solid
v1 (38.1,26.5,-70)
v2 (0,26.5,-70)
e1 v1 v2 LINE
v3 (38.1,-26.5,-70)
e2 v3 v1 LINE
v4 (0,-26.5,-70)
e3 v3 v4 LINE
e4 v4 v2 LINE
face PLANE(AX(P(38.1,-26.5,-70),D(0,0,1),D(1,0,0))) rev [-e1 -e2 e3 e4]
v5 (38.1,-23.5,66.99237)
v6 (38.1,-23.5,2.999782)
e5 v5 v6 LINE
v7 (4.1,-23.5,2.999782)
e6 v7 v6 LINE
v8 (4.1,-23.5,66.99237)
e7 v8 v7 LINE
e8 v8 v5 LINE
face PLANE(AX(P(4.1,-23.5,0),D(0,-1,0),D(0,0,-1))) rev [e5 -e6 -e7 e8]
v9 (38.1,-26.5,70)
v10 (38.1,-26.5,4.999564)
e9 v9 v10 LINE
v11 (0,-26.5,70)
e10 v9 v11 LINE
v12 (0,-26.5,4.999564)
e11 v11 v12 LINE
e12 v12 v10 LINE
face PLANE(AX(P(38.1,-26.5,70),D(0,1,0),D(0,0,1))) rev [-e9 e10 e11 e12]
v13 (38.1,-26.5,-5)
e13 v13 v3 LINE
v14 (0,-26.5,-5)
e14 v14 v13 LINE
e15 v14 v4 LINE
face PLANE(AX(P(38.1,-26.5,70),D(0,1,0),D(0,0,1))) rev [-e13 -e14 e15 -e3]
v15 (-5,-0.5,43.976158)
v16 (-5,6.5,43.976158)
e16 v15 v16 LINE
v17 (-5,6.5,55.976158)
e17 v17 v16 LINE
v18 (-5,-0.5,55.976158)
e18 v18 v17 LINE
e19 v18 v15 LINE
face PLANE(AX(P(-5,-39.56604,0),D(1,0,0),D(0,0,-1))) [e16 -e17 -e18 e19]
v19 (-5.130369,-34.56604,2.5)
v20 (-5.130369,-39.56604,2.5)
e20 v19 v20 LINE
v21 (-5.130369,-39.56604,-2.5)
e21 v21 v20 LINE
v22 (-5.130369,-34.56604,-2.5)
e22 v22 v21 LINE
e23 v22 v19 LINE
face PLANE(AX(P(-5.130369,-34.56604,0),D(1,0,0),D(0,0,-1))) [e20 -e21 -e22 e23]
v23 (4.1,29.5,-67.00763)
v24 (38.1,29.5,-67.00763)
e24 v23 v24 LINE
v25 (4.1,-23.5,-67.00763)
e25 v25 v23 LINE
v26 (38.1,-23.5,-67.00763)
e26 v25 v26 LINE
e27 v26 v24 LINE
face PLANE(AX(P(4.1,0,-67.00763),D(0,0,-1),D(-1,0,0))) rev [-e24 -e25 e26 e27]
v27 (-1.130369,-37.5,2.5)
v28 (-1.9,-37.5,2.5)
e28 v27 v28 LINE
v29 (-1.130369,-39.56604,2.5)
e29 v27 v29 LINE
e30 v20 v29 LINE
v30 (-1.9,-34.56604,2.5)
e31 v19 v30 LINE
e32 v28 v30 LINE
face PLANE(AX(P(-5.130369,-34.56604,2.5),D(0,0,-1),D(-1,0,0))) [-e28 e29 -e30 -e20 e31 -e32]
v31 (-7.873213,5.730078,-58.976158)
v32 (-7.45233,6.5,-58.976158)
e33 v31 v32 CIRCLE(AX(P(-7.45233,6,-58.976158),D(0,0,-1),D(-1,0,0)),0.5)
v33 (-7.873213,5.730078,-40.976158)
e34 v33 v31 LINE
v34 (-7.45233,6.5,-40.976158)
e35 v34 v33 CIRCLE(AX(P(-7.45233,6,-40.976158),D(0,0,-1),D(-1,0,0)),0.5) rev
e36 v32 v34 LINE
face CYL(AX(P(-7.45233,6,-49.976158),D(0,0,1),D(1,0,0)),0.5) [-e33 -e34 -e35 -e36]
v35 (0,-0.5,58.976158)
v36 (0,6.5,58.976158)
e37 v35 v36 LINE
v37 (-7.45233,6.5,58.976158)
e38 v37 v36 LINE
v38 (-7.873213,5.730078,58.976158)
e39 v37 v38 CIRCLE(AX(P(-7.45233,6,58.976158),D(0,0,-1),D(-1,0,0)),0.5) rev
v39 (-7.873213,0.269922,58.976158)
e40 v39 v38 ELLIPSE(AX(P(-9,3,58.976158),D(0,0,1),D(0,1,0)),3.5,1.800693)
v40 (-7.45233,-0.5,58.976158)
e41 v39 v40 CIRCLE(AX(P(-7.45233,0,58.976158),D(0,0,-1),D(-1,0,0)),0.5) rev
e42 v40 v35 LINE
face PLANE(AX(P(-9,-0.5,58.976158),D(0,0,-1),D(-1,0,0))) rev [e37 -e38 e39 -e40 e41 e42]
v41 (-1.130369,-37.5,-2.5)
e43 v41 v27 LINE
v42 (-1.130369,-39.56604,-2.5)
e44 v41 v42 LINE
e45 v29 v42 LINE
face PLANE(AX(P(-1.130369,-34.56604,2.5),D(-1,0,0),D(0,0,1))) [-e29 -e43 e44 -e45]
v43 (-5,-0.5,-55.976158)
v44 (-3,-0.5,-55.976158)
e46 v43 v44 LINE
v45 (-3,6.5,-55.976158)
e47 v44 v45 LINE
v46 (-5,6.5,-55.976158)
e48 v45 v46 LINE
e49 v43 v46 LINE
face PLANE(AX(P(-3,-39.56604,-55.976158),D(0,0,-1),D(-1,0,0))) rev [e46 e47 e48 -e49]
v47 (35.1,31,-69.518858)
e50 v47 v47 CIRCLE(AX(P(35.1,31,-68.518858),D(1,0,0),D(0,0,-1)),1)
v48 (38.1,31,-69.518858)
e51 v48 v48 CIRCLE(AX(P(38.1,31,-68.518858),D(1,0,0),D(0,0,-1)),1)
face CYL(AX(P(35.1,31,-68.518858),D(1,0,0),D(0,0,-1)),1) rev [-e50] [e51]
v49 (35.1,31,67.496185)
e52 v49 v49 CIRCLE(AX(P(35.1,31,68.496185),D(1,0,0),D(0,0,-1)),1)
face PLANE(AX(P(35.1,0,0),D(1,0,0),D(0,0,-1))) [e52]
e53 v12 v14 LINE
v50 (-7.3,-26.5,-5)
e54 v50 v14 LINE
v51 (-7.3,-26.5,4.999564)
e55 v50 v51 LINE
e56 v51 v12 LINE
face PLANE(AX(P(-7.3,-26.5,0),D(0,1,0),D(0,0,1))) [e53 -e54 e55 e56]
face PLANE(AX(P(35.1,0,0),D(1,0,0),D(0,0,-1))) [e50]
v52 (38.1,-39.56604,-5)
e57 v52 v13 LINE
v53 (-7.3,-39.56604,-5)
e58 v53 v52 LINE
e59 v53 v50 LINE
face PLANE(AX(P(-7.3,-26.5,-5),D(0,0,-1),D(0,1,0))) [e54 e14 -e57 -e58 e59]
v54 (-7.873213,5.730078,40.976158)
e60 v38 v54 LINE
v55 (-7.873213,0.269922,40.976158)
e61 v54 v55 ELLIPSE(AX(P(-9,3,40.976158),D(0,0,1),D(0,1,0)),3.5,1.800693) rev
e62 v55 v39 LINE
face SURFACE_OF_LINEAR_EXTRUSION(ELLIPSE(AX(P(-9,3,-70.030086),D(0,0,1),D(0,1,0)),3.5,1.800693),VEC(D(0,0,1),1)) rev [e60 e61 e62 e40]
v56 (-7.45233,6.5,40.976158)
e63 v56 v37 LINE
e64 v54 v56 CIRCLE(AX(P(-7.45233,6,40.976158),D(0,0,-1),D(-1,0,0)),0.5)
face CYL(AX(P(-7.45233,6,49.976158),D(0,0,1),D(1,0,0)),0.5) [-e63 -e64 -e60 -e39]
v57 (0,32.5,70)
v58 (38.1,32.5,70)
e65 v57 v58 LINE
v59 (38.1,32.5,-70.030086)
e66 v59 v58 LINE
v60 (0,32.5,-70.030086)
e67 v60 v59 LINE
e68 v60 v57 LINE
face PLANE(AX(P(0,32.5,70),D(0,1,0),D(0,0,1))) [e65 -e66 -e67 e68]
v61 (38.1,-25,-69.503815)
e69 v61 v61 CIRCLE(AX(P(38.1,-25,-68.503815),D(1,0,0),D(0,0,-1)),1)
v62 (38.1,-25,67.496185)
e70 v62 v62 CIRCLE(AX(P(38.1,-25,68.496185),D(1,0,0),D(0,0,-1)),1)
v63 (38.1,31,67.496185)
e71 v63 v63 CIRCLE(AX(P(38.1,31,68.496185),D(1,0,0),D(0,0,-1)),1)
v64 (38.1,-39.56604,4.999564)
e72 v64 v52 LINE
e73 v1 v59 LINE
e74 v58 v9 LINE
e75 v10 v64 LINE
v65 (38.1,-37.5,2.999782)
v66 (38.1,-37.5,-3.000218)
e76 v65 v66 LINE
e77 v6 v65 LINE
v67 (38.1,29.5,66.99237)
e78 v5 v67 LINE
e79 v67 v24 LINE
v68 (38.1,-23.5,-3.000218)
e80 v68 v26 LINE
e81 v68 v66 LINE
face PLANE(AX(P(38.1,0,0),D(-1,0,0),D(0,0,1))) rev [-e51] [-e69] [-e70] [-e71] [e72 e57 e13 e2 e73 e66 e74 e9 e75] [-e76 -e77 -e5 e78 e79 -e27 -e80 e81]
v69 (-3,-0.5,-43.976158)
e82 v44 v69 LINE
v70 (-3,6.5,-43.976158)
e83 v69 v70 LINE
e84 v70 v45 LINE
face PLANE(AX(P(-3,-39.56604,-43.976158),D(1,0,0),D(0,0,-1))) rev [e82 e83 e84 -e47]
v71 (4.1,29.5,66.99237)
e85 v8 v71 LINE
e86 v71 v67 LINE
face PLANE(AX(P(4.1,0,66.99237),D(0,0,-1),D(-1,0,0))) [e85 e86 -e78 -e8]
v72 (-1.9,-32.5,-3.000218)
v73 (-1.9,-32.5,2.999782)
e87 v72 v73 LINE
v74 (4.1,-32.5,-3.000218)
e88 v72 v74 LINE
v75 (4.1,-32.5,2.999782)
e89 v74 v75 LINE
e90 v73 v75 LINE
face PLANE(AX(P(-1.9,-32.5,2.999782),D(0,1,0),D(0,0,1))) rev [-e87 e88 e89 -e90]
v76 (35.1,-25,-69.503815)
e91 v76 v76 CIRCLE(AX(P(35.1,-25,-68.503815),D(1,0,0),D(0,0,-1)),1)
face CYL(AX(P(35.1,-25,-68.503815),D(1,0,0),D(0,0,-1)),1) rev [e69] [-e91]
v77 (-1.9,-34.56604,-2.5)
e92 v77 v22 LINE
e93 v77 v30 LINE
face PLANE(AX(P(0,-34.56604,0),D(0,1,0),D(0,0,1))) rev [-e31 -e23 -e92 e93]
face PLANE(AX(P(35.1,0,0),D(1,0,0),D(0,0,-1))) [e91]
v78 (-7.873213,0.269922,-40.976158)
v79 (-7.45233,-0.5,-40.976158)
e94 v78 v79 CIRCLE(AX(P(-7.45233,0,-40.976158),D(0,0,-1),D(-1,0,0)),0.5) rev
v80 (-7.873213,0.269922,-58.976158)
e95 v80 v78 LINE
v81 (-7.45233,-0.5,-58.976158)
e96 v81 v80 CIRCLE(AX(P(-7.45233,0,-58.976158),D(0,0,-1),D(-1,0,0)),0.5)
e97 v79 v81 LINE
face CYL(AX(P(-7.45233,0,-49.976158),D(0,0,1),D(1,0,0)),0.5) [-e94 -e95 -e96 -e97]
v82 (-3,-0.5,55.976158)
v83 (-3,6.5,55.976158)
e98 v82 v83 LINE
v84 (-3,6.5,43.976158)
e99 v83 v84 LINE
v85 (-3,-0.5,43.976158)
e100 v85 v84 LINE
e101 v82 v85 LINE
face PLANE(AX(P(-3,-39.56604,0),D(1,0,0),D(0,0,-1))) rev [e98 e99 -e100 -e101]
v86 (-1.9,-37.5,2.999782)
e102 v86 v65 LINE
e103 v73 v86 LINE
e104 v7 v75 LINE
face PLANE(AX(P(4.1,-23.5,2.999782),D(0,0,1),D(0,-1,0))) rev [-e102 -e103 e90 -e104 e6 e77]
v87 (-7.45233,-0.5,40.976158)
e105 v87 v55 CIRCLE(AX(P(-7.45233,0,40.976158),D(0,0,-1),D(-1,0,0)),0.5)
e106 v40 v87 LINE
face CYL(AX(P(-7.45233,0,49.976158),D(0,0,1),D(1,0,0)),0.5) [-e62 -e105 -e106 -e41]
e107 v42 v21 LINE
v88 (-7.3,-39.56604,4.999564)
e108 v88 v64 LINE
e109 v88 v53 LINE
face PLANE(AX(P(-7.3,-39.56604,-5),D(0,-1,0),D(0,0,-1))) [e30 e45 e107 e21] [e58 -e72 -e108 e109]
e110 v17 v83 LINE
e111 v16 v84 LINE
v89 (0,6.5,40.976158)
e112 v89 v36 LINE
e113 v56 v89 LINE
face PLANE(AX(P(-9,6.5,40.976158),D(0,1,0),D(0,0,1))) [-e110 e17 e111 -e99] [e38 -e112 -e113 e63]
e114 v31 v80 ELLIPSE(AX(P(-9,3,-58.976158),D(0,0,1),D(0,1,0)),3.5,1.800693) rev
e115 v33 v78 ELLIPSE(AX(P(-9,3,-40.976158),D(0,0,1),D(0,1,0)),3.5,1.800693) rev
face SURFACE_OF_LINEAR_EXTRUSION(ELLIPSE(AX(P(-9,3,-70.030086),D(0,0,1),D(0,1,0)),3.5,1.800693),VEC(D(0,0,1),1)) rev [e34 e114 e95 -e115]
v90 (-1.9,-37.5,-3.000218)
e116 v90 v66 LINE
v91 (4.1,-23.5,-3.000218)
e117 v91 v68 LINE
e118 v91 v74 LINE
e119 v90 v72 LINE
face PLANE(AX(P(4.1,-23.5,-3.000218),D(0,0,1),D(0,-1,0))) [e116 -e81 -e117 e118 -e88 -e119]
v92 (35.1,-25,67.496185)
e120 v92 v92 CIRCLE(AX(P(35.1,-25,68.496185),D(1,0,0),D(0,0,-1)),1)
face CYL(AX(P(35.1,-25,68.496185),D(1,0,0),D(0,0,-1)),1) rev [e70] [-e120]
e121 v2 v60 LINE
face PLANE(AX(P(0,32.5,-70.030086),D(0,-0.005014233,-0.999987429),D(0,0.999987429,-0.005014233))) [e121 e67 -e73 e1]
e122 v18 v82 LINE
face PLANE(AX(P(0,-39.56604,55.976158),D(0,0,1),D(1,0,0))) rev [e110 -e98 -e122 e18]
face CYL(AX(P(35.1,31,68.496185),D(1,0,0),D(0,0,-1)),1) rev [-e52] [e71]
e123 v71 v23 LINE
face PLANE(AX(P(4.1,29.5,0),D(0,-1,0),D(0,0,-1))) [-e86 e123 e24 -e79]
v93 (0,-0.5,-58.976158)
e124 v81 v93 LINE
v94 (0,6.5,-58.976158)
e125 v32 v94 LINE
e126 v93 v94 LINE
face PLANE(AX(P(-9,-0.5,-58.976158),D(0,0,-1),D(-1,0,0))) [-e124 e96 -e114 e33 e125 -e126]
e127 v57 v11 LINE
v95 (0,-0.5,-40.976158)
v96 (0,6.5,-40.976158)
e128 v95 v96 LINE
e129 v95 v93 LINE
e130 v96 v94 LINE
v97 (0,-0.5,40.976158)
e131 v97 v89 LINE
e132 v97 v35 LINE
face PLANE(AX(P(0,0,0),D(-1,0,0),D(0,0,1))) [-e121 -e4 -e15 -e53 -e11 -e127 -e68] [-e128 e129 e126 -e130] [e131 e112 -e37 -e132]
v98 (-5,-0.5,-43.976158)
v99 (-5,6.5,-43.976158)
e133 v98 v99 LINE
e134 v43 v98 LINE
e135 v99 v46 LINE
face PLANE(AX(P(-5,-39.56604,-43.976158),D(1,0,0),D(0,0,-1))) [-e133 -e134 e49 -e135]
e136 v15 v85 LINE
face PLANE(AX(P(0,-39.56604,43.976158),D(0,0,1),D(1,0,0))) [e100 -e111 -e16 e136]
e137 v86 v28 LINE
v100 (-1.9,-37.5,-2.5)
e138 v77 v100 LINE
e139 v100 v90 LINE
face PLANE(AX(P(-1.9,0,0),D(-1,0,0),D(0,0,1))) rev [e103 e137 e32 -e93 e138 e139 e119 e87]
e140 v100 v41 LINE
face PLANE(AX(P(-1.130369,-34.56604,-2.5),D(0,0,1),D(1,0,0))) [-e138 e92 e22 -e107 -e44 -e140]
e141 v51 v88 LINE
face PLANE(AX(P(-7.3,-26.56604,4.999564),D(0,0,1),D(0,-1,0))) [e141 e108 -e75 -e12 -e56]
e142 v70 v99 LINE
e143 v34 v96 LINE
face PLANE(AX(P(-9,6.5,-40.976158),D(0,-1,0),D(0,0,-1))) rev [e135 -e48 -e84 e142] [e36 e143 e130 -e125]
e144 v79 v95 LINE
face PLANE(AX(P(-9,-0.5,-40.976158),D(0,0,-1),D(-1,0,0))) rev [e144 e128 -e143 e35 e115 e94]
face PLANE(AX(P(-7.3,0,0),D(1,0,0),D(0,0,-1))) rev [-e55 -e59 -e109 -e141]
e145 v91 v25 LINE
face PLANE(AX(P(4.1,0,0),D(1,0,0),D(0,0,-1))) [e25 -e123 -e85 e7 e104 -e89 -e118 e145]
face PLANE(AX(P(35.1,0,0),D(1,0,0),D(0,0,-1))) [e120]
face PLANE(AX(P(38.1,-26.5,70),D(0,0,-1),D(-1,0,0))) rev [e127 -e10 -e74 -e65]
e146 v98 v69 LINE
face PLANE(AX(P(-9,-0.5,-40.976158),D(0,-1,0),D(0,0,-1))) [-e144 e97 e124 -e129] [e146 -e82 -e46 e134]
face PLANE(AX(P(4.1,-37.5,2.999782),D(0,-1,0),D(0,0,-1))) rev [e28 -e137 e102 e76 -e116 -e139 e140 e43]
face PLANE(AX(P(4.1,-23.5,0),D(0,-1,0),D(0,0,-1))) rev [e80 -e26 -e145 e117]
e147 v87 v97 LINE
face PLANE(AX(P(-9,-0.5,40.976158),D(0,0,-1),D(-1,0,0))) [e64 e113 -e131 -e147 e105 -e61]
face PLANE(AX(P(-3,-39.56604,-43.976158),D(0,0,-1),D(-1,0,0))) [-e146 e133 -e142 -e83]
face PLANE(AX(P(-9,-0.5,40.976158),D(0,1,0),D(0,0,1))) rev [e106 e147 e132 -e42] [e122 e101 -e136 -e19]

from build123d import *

# Parameters (mm, degrees)
SKETCH1_W           = 140
SKETCH1_H           = 53
BOSS_EXTRUDE1_DEPTH = 38.1
BOSS_EXTRUDE2_DEPTH = 45.4
CUT_EXTRUDE1_DEPTH  = 5
BOSS_EXTRUDE3_DEPTH = 45.4
BOSS_EXTRUDE4_DEPTH = 38.1
SKETCH11_W          = 134
SKETCH11_H          = 53
CUT_EXTRUDE2_DEPTH  = 34
SKETCH12_W          = 6
SKETCH12_H          = 14
CUT_EXTRUDE3_DEPTH  = 34
SKETCH13_W          = 6
SKETCH13_H          = 5
CUT_EXTRUDE4_DEPTH  = 6
CUT_EXTRUDE6_DEPTH  = 3
CUT_EXTRUDE7_DEPTH  = 3
SKETCH17_W          = 18
SKETCH17_H          = 7
BOSS_EXTRUDE5_DEPTH = 9
SKETCH21_W          = 2
SKETCH21_H          = 12
CUT_EXTRUDE10_DEPTH = 93.075528643
SKETCH23_RX         = 3.5
SKETCH23_RY         = 1.800693379
CUT_EXTRUDE12_DEPTH = 141.213025648
FILLET3_START       = -60
FILLET3_DEPTH       = 120


with BuildPart() as part:
    # Sketch1 → Boss-Extrude1 (new body)
    with BuildSketch(Plane(origin=(0, 0, 0), x_dir=(0, 0, -1), z_dir=(1, 0, 0))):
        Rectangle(SKETCH1_W, SKETCH1_H)
    extrude(amount=BOSS_EXTRUDE1_DEPTH)

    # Sketch2 → Boss-Extrude2 (add)
    with BuildSketch(Plane(origin=(38.1, 0, 0), x_dir=(0, 0, -1), z_dir=(1, 0, 0))):
        Polygon((0, -26.5), (5, -26.5), (5, -39.566040215), (-4.99956385, -39.566040215), (-4.99956385, -26.566040215), align=None)
    extrude(amount=-BOSS_EXTRUDE2_DEPTH)

    # Sketch3 → Cut-Extrude1 (cut)
    with BuildSketch(Plane.XZ.offset(39.566040215)):
        Polygon((-5.130369, 0), (-5.130369, 2.5), (-1.130369, 2.5), (-1.130369, -2.5), (-5.130369, -2.5), align=None)
    extrude(amount=-CUT_EXTRUDE1_DEPTH, mode=Mode.SUBTRACT)

    # Sketch7 → Boss-Extrude3 (add)
    with BuildSketch(Plane(origin=(38.1, 0, 0), x_dir=(0, 0, -1), z_dir=(1, 0, 0))):
        Polygon((-4.99956385, -26.566040215), (-4.99956385, -26.5), (0, -26.5), align=None)
    extrude(amount=-BOSS_EXTRUDE3_DEPTH)

    # Sketch8 → Boss-Extrude4 (add)
    with BuildSketch(Plane(origin=(38.1, 0, 0), x_dir=(0, 0, -1), z_dir=(1, 0, 0))):
        Polygon((-70, 26.5), (-70, 32.5), (70.030085777, 32.5), (70, 26.5), align=None)
    extrude(amount=-BOSS_EXTRUDE4_DEPTH)

    # Sketch11 → Cut-Extrude2 (cut)
    with BuildSketch(Plane(origin=(38.1, 0, 0), x_dir=(0, 0, -1), z_dir=(1, 0, 0))):
        with Locations((0.007630482, 3)):
            Rectangle(SKETCH11_W, SKETCH11_H)
    extrude(amount=-CUT_EXTRUDE2_DEPTH, mode=Mode.SUBTRACT)

    # Sketch12 → Cut-Extrude3 (cut)
    with BuildSketch(Plane(origin=(38.1, 0, 0), x_dir=(0, 0, -1), z_dir=(1, 0, 0))):
        with Locations((0.000218075, -30.5)):
            Rectangle(SKETCH12_W, SKETCH12_H)
    extrude(amount=-CUT_EXTRUDE3_DEPTH, mode=Mode.SUBTRACT)

    # Sketch13 → Cut-Extrude4 (cut)
    with BuildSketch(Plane(origin=(4.1, 0, 0), x_dir=(0, 0, -1), z_dir=(1, 0, 0))):
        with Locations((0.000218075, -35)):
            Rectangle(SKETCH13_W, SKETCH13_H)
    extrude(amount=-CUT_EXTRUDE4_DEPTH, mode=Mode.SUBTRACT)

    # Sketch15 → Cut-Extrude6 (cut)
    with BuildSketch(Plane(origin=(38.1, 0, 0), x_dir=(0, 0, -1), z_dir=(1, 0, 0))):
        with BuildLine():
            ThreePointArc((-67.496184759, 31), (-68.114088128, 31.924122375), (-69.204189088, 31.706208093))
            Line((-69.204189088, 31.706208093), (-67.78818043, 30.293791907))
            ThreePointArc((-67.78818043, 30.293791907), (-67.572062384, 30.617903369), (-67.496184759, 31))
        make_face()
        with BuildLine():
            Line((-67.78818043, 30.293791907), (-69.204189088, 31.706208093))
            ThreePointArc((-69.204189088, 31.706208093), (-69.202392852, 30.291995671), (-67.78818043, 30.293791907))
        make_face()
    extrude(amount=-CUT_EXTRUDE6_DEPTH, mode=Mode.SUBTRACT)

    # Sketch16 → Cut-Extrude7 (cut)
    with BuildSketch(Plane(origin=(38.1, 0, 0), x_dir=(0, 0, -1), z_dir=(1, 0, 0))):
        with BuildLine():
            ThreePointArc((69.228596491, 31.70446537), (67.814392759, 31.709738362), (67.809119767, 30.29553463))
            Line((67.809119767, 30.29553463), (69.228596491, 31.70446537))
        make_face()
        with BuildLine():
            Line((69.228596491, 31.70446537), (67.809119767, 30.29553463))
            ThreePointArc((67.809119767, 30.29553463), (68.899818519, 30.075408641), (69.518858129, 31))
            ThreePointArc((69.518858129, 31), (69.443449488, 31.38096039), (69.228596491, 31.70446537))
        make_face()
        with BuildLine():
            ThreePointArc((69.503815241, -25), (68.887086814, -24.076364303), (67.797609438, -24.291993387))
            Line((67.797609438, -24.291993387), (69.210021043, -25.708006613))
            ThreePointArc((69.210021043, -25.708006613), (69.427450938, -25.383271573), (69.503815241, -25))
        make_face()
        with BuildLine():
            Line((69.210021043, -25.708006613), (67.797609438, -24.291993387))
            ThreePointArc((67.797609438, -24.291993387), (67.795808628, -25.706205803), (69.210021043, -25.708006613))
        make_face()
        with BuildLine():
            ThreePointArc((-67.496184759, -25), (-67.572062384, -24.617903369), (-67.78818043, -24.293791907))
            Line((-67.78818043, -24.293791907), (-69.204189088, -25.706208093))
            ThreePointArc((-69.204189088, -25.706208093), (-68.114088128, -25.924122375), (-67.496184759, -25))
        make_face()
        with BuildLine():
            Line((-69.204189088, -25.706208093), (-67.78818043, -24.293791907))
            ThreePointArc((-67.78818043, -24.293791907), (-69.202392852, -24.291995671), (-69.204189088, -25.706208093))
        make_face()
    extrude(amount=-CUT_EXTRUDE7_DEPTH, mode=Mode.SUBTRACT)

    # Sketch17 → Boss-Extrude5 (add)
    with BuildSketch(Plane.ZY):
        with Locations((49.976158348, 3)):
            Rectangle(SKETCH17_W, SKETCH17_H)
        with Locations((-49.976158348, 3)):
            Rectangle(SKETCH17_W, SKETCH17_H)
    extrude(amount=BOSS_EXTRUDE5_DEPTH)

    # Sketch21 → Cut-Extrude10 (cut, through all)
    with BuildSketch(Plane(origin=(0, 6.5, 0), x_dir=(1, 0, 0), z_dir=(0, 1, 0))):
        with Locations((-4, -49.976158348)):
            Rectangle(SKETCH21_W, SKETCH21_H)
        with Locations((-4, 49.976158348)):
            Rectangle(SKETCH21_W, SKETCH21_H)
    extrude(amount=-CUT_EXTRUDE10_DEPTH, mode=Mode.SUBTRACT)

    # Sketch23 → Cut-Extrude12 (cut, through all)
    with BuildSketch(Plane.XY.offset(58.976158348)):
        with Locations(Location((-9, 3), (0, 0, 90))):
            Ellipse(SKETCH23_RX, SKETCH23_RY)
    extrude(amount=-CUT_EXTRUDE12_DEPTH, mode=Mode.SUBTRACT)

    # Fillet3: read off the stored shape, not the designer's step
    # Fillet3 outline → Fillet3 (cut)
    with BuildSketch(Plane.XY.offset(FILLET3_START)):
        with BuildLine():
            ThreePointArc((-7.452330452, -0.5), (-7.891056374, -0.239832369), (-7.873213162, 0.269921739))
            add(Edge.make_bspline(
                [(-9, -0.5), (-8.366981638, -0.5), (-7.873213162, 0.269921739)],
                knots=[3.141592654, 3.141592654, 3.141592654, 3.823261415, 3.823261415, 3.823261415], degree=2, weights=[1, 0.872894942, 0.856107875]))
            Line((-9, -0.5), (-7.452330452, -0.5))
        make_face()
        with BuildLine():
            add(Edge.make_bspline(
                [(-7.873213161, 5.730078261), (-8.366981638, 6.5), (-9, 6.5)],
                knots=[5.601516546, 5.601516546, 5.601516546, 6.283185307, 6.283185307, 6.283185307], degree=2, weights=[0.856107875, 0.872894942, 1]))
            ThreePointArc((-7.873213161, 5.730078261), (-7.891056374, 6.239832369), (-7.452330452, 6.5))
            Line((-7.452330452, 6.5), (-9, 6.5))
        make_face()
    extrude(amount=FILLET3_DEPTH, mode=Mode.SUBTRACT)


solid = part.part
